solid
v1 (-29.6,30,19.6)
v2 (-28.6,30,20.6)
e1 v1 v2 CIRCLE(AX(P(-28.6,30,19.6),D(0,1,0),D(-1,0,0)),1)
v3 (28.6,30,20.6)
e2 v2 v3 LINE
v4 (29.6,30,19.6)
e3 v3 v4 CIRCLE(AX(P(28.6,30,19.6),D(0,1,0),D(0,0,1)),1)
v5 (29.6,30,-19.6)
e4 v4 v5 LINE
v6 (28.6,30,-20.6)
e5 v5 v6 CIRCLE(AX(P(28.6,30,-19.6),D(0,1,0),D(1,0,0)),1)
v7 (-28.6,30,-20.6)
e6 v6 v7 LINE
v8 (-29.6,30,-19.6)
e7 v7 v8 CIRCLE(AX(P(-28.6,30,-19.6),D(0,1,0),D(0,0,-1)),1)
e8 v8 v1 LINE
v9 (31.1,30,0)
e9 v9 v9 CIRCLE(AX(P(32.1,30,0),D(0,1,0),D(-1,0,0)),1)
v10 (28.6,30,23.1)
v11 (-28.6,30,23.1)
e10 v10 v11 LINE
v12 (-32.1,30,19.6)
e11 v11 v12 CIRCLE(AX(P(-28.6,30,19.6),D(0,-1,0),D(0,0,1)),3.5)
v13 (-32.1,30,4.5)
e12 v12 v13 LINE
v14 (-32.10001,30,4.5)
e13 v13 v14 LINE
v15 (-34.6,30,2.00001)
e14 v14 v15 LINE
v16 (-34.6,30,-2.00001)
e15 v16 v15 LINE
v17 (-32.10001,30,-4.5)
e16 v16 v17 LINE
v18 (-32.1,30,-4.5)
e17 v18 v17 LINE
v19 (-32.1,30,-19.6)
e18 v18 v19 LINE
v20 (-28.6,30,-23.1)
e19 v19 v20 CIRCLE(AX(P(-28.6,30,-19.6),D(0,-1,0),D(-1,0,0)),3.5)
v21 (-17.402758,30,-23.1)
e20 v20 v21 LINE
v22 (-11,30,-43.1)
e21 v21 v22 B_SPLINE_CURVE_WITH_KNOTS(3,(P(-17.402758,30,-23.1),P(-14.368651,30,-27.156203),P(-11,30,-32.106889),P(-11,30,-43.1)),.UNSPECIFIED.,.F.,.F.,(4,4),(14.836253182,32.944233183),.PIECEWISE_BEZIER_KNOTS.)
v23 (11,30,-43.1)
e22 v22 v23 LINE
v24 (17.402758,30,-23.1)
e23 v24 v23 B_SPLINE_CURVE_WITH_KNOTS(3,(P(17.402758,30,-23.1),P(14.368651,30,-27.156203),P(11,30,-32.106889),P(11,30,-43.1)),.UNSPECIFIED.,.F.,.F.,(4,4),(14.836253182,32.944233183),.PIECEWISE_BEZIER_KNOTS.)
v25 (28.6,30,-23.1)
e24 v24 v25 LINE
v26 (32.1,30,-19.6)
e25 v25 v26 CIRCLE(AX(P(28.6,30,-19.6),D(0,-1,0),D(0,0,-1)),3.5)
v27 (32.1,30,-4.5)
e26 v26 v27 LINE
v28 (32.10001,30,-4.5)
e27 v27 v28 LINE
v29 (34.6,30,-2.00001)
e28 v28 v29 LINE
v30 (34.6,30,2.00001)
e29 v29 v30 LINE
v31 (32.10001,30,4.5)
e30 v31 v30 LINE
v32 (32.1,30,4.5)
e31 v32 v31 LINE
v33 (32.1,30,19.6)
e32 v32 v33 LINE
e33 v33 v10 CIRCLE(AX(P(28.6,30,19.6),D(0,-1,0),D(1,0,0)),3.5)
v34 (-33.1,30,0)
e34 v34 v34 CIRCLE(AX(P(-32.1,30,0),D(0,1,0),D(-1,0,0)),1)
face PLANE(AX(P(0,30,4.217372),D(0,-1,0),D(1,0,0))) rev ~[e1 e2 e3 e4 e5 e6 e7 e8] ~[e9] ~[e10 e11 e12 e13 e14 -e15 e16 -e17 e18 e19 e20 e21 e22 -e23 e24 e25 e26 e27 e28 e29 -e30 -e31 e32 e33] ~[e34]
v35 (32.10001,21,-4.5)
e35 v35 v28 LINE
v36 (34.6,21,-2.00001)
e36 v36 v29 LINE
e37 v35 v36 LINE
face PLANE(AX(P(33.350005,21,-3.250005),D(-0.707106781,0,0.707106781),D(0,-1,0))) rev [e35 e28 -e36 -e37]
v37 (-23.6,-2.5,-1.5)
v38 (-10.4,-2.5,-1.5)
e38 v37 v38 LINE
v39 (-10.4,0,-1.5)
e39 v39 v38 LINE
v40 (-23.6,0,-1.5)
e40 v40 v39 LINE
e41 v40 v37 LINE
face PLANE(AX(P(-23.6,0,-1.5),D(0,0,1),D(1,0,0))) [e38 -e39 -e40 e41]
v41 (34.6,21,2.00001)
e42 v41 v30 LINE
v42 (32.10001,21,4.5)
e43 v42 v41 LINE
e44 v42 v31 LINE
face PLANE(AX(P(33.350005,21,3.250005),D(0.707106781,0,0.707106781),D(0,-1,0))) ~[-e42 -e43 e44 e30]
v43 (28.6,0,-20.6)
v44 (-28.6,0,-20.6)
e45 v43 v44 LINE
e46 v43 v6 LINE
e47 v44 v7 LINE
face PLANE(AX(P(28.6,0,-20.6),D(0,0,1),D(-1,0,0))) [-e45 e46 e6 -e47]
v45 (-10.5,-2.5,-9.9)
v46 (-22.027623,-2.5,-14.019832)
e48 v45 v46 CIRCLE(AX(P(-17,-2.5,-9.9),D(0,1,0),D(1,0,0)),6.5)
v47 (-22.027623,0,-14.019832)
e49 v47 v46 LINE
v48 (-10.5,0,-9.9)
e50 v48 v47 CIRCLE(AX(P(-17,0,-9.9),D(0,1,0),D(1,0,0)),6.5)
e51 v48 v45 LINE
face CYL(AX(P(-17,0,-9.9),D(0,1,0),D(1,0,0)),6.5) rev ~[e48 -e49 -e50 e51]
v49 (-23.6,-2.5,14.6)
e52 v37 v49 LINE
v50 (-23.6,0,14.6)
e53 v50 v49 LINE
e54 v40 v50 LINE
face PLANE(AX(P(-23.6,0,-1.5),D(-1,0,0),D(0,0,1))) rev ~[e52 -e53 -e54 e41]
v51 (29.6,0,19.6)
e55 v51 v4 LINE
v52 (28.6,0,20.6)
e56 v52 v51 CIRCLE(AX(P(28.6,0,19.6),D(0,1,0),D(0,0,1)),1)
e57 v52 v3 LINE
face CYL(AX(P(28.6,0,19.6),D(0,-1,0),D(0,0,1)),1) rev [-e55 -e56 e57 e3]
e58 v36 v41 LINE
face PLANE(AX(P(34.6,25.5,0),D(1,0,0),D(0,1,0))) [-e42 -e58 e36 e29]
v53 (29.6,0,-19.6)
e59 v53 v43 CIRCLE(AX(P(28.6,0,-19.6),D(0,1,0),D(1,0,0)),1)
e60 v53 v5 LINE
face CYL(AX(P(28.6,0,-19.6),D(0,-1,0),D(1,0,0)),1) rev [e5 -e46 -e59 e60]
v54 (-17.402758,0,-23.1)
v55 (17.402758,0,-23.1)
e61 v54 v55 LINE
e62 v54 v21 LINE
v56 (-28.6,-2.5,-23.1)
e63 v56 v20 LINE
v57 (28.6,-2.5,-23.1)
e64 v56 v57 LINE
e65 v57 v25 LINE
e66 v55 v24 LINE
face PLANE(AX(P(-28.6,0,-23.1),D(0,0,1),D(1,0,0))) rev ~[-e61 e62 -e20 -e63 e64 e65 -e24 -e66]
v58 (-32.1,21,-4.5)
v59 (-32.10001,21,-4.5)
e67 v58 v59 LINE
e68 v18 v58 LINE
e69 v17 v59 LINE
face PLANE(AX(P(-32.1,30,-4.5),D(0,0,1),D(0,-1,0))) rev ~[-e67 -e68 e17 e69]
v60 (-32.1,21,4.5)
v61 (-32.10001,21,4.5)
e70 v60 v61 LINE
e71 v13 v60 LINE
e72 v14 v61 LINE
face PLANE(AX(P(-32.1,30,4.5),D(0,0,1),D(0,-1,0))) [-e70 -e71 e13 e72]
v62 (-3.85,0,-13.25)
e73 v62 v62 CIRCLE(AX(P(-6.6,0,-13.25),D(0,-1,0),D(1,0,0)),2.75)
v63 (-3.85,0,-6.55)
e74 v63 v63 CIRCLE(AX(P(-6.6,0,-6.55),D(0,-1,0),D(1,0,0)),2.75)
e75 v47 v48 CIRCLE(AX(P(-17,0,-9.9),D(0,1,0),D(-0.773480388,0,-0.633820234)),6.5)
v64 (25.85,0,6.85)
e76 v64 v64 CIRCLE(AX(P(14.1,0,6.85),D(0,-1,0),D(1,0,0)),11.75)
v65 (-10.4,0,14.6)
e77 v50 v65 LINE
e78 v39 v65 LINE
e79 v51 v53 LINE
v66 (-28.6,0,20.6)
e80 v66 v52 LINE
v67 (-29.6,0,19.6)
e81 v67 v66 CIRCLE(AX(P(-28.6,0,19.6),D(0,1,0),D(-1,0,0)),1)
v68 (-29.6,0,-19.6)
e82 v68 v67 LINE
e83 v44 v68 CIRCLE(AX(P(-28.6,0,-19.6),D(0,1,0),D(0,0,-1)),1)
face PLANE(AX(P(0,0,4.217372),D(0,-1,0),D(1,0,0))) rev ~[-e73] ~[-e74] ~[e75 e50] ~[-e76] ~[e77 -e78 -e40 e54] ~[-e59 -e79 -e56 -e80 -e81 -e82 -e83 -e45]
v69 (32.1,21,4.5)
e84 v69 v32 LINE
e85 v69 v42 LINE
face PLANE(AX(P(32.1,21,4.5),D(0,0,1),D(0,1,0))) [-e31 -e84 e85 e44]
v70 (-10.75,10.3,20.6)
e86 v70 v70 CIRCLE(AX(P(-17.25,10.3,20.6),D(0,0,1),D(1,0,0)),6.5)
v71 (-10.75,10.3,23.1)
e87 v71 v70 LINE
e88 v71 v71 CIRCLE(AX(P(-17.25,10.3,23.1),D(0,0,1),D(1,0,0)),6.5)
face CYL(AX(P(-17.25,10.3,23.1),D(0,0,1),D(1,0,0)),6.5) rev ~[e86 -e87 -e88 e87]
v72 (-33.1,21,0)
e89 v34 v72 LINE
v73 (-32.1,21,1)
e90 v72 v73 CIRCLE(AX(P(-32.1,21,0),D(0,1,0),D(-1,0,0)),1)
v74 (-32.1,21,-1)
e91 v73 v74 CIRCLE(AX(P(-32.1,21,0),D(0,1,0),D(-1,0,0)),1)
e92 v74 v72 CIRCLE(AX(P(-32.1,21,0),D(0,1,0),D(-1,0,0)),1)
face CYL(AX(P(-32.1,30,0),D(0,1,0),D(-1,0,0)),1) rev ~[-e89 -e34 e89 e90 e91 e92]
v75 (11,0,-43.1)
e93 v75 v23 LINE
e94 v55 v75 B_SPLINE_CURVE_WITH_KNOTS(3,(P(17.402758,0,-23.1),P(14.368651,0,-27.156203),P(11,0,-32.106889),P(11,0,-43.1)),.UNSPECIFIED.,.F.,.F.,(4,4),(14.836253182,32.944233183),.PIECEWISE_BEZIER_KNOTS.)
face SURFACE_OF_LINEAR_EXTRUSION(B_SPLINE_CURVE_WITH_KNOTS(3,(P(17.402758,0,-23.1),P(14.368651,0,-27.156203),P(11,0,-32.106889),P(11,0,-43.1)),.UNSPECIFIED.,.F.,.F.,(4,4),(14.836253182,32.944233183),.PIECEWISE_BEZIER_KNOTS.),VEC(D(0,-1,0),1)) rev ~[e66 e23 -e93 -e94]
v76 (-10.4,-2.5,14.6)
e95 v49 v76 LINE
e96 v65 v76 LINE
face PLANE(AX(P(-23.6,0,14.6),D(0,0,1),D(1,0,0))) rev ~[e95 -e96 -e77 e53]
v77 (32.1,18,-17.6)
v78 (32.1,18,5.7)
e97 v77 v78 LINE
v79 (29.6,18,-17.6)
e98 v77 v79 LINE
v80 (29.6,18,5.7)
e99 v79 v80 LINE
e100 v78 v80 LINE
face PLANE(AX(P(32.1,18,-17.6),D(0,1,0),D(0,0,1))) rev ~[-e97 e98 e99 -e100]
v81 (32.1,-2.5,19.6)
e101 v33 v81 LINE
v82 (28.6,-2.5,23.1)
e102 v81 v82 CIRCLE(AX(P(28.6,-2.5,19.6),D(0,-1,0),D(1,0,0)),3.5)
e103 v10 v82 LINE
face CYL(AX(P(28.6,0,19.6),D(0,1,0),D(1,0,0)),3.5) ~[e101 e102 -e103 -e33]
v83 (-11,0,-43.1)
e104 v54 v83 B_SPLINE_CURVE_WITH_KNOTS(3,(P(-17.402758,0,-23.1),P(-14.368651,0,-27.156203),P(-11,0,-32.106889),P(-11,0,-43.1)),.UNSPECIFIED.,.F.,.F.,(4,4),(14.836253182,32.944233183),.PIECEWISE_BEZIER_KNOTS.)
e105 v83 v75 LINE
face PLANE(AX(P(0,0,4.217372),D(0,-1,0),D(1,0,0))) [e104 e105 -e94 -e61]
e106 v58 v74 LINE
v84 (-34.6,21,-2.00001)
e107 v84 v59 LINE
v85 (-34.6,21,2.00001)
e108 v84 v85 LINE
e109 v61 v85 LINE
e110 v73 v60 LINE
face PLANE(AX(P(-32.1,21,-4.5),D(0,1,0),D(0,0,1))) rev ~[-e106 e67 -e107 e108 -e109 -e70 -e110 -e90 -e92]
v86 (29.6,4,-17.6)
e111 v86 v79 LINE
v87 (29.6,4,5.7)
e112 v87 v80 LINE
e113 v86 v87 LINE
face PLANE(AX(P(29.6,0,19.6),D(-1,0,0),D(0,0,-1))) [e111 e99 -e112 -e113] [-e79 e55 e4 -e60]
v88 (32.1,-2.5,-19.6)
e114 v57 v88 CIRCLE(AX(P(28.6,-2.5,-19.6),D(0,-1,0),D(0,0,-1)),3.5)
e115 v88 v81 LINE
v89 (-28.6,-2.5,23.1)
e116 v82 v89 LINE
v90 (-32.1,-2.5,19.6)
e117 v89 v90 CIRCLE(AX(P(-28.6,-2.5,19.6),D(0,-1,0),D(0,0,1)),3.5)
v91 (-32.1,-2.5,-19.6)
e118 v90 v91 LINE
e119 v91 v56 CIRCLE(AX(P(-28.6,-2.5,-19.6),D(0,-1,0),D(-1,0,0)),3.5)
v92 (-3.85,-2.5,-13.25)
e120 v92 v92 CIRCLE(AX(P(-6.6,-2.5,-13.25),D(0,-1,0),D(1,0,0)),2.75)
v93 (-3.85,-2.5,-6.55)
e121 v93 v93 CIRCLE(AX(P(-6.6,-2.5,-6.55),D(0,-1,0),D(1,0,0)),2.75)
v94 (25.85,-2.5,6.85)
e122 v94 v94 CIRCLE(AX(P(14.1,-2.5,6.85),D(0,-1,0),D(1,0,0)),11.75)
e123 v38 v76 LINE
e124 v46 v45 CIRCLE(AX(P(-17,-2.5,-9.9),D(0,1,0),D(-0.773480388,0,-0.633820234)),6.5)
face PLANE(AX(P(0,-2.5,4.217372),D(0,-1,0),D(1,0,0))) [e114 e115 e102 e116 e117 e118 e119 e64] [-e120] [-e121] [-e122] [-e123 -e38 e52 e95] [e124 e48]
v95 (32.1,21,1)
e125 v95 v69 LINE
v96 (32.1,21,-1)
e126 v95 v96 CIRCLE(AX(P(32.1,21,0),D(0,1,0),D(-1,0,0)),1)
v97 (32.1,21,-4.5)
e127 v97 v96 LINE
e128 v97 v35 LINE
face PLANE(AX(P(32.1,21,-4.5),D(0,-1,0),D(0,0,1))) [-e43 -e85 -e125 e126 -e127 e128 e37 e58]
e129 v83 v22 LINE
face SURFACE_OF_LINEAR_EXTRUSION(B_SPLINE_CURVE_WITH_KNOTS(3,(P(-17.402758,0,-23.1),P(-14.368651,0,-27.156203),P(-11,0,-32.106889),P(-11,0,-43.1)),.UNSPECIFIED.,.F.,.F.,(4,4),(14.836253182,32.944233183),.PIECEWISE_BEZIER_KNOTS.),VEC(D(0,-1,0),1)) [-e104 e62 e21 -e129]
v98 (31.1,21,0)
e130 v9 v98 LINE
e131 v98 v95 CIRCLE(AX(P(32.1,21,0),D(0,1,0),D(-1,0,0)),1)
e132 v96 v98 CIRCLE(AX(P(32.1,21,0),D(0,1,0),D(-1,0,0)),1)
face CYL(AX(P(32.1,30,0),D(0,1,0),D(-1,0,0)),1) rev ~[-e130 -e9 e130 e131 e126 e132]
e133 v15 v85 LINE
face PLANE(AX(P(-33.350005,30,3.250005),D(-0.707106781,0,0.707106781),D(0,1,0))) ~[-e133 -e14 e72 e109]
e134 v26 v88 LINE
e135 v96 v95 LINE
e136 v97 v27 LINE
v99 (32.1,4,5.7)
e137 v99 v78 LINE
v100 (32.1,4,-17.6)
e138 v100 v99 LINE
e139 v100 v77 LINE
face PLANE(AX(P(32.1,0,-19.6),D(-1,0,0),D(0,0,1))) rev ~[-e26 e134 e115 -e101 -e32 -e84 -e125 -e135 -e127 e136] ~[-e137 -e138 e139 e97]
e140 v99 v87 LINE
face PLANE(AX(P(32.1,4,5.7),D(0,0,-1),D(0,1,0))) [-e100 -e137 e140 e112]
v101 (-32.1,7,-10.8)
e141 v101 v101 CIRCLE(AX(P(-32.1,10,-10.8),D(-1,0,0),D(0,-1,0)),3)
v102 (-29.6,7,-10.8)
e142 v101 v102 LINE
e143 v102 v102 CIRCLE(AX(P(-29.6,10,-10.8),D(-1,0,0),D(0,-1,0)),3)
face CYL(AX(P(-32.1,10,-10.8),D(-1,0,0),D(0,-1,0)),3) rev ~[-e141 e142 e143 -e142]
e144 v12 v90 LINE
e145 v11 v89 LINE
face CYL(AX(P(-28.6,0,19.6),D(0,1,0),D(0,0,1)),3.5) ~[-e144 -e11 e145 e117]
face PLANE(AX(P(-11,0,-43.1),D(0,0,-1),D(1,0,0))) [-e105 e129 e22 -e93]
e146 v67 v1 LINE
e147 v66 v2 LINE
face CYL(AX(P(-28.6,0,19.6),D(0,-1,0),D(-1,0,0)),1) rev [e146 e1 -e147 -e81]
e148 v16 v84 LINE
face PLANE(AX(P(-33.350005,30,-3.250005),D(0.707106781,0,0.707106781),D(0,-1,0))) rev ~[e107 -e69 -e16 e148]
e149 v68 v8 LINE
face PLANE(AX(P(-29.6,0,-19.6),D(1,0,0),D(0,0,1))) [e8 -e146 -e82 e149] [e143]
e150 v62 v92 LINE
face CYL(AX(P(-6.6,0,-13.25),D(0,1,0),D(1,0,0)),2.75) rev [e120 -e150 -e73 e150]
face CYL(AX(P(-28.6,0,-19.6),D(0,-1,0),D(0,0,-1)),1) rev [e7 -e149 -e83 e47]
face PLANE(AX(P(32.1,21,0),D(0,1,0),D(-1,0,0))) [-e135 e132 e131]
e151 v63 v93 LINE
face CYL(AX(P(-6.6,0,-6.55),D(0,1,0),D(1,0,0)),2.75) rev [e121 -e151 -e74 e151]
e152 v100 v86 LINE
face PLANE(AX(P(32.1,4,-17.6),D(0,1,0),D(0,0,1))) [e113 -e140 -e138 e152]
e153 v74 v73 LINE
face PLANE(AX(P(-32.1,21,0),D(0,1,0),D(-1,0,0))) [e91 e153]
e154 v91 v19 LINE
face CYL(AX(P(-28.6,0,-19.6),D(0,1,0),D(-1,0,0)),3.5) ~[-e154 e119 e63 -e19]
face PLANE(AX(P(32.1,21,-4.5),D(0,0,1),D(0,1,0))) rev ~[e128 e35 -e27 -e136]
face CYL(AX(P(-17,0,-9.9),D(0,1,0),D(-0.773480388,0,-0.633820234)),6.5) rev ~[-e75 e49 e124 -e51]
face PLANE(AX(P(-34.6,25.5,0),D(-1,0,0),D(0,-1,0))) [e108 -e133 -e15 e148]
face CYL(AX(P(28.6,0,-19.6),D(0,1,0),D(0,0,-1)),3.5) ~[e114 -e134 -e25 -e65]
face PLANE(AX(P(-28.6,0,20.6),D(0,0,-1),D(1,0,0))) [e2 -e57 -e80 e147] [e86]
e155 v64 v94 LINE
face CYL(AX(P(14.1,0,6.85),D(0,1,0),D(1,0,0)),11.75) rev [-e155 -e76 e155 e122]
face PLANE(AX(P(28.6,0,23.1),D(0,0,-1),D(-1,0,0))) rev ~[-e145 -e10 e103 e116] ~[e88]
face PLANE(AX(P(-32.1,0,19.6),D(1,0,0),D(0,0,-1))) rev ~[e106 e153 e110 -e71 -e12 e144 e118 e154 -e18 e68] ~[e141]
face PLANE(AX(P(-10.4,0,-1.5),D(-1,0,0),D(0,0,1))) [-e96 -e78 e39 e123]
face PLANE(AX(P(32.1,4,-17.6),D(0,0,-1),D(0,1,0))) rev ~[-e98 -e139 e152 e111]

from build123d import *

# Parameters (mm, degrees)
F1_DEPTH  = 30
F0_R      = 2.75
F0_W      = 13.2
F0_H      = 16.1
F0_R_2    = 11.75
F2_DEPTH  = 2.5
F3_R      = 6.5
F4_DEPTH  = 2.5
F5_R      = 3
F6_DEPTH  = 2.5
F7_W      = 14
F7_H      = 23.3
F8_DEPTH  = 2.5
F5_W      = 9
F5_H      = 9
F9_DEPTH  = 2.5
F7_W_2    = 9
F7_H_2    = 9
F10_DEPTH = 2.5
F11_SIZE  = 2.49999
F12_R     = 1
F13_DEPTH = 9


# Not quite as in the source:
# - a fillet or chamfer is up to 0.001 mm smaller than in the source, because OpenCascade refuses the exact size


with BuildPart() as f1:
    # F0 (on Front) → F1 (new body)
    with BuildSketch(Plane.XZ):
        with BuildLine():
            Line((-28.6, 20.6), (28.6, 20.6))
            ThreePointArc((28.6, 20.6), (29.3071067812, 20.3071067812), (29.6, 19.6))
            Line((29.6, 19.6), (29.6, -19.6))
            ThreePointArc((29.6, -19.6), (29.3071067812, -20.3071067812), (28.6, -20.6))
            Line((28.6, -20.6), (19.2463447419, -20.6))
            add(Edge.make_bspline(
                [(19.2463447419, -20.6), (18.6700440776, -21.4257741259), (18.043869698, -22.2429184725), (17.402758481, -23.1)],
                knots=[11.0100107819, 11.0100107819, 11.0100107819, 11.0100107819, 14.8362531821, 14.8362531821, 14.8362531821, 14.8362531821], degree=3))
            Line((17.402758481, -23.1), (28.6, -23.1))
            ThreePointArc((28.6, -23.1), (31.0748737342, -22.0748737342), (32.1, -19.6))
            Line((32.1, -19.6), (32.1, 19.6))
            ThreePointArc((32.1, 19.6), (31.0748737342, 22.0748737342), (28.6, 23.1))
            Line((28.6, 23.1), (-28.6, 23.1))
            ThreePointArc((-28.6, 23.1), (-31.0748737342, 22.0748737342), (-32.1, 19.6))
            Line((-32.1, 19.6), (-32.1, -19.6))
            ThreePointArc((-32.1, -19.6), (-31.0748737342, -22.0748737342), (-28.6, -23.1))
            Line((-28.6, -23.1), (-17.402758481, -23.1))
            add(Edge.make_bspline(
                [(-19.2463447419, -20.6), (-18.6700440776, -21.4257741259), (-18.043869698, -22.2429184725), (-17.402758481, -23.1)],
                knots=[11.0100107819, 11.0100107819, 11.0100107819, 11.0100107819, 14.8362531821, 14.8362531821, 14.8362531821, 14.8362531821], degree=3))
            Line((-19.2463447419, -20.6), (-28.6, -20.6))
            ThreePointArc((-28.6, -20.6), (-29.3071067812, -20.3071067812), (-29.6, -19.6))
            Line((-29.6, -19.6), (-29.6, 19.6))
            ThreePointArc((-29.6, 19.6), (-29.3071067812, 20.3071067812), (-28.6, 20.6))
        make_face()
        with BuildLine():
            add(Edge.make_bspline(
                [(19.2463447419, -20.6), (18.6700440776, -21.4257741259), (18.043869698, -22.2429184725), (17.402758481, -23.1)],
                knots=[11.0100107819, 11.0100107819, 11.0100107819, 11.0100107819, 14.8362531821, 14.8362531821, 14.8362531821, 14.8362531821], degree=3))
            Line((19.2463447419, -20.6), (-19.2463447419, -20.6))
            add(Edge.make_bspline(
                [(-19.2463447419, -20.6), (-18.6700440776, -21.4257741259), (-18.043869698, -22.2429184725), (-17.402758481, -23.1)],
                knots=[11.0100107819, 11.0100107819, 11.0100107819, 11.0100107819, 14.8362531821, 14.8362531821, 14.8362531821, 14.8362531821], degree=3))
            Line((-17.402758481, -23.1), (17.402758481, -23.1))
        make_face()
        with BuildLine():
            add(Edge.make_bspline(
                [(17.402758481, -23.1), (14.3686514172, -27.1562028058), (11, -32.1068893696), (11, -43.1)],
                knots=[14.8362531821, 14.8362531821, 14.8362531821, 14.8362531821, 32.9442331828, 32.9442331828, 32.9442331828, 32.9442331828], degree=3))
            Line((17.402758481, -23.1), (-17.402758481, -23.1))
            add(Edge.make_bspline(
                [(-17.402758481, -23.1), (-14.3686514172, -27.1562028058), (-11, -32.1068893696), (-11, -43.1)],
                knots=[14.8362531821, 14.8362531821, 14.8362531821, 14.8362531821, 32.9442331828, 32.9442331828, 32.9442331828, 32.9442331828], degree=3))
            Line((-11, -43.1), (11, -43.1))
        make_face()
    extrude(amount=-F1_DEPTH)

    # F0 (on Front) → F2 (join)
    with BuildSketch(Plane.XZ):
        with BuildLine():
            Line((-28.6, 20.6), (28.6, 20.6))
            ThreePointArc((28.6, 20.6), (29.3071067812, 20.3071067812), (29.6, 19.6))
            Line((29.6, 19.6), (29.6, -19.6))
            ThreePointArc((29.6, -19.6), (29.3071067812, -20.3071067812), (28.6, -20.6))
            Line((28.6, -20.6), (19.2463447419, -20.6))
            add(Edge.make_bspline(
                [(19.2463447419, -20.6), (18.6700440776, -21.4257741259), (18.043869698, -22.2429184725), (17.402758481, -23.1)],
                knots=[11.0100107819, 11.0100107819, 11.0100107819, 11.0100107819, 14.8362531821, 14.8362531821, 14.8362531821, 14.8362531821], degree=3))
            Line((17.402758481, -23.1), (28.6, -23.1))
            ThreePointArc((28.6, -23.1), (31.0748737342, -22.0748737342), (32.1, -19.6))
            Line((32.1, -19.6), (32.1, 19.6))
            ThreePointArc((32.1, 19.6), (31.0748737342, 22.0748737342), (28.6, 23.1))
            Line((28.6, 23.1), (-28.6, 23.1))
            ThreePointArc((-28.6, 23.1), (-31.0748737342, 22.0748737342), (-32.1, 19.6))
            Line((-32.1, 19.6), (-32.1, -19.6))
            ThreePointArc((-32.1, -19.6), (-31.0748737342, -22.0748737342), (-28.6, -23.1))
            Line((-28.6, -23.1), (-17.402758481, -23.1))
            add(Edge.make_bspline(
                [(-19.2463447419, -20.6), (-18.6700440776, -21.4257741259), (-18.043869698, -22.2429184725), (-17.402758481, -23.1)],
                knots=[11.0100107819, 11.0100107819, 11.0100107819, 11.0100107819, 14.8362531821, 14.8362531821, 14.8362531821, 14.8362531821], degree=3))
            Line((-19.2463447419, -20.6), (-28.6, -20.6))
            ThreePointArc((-28.6, -20.6), (-29.3071067812, -20.3071067812), (-29.6, -19.6))
            Line((-29.6, -19.6), (-29.6, 19.6))
            ThreePointArc((-29.6, 19.6), (-29.3071067812, 20.3071067812), (-28.6, 20.6))
        make_face()
        with BuildLine():
            ThreePointArc((29.6, 19.6), (29.3071067812, 20.3071067812), (28.6, 20.6))
            Line((28.6, 20.6), (-28.6, 20.6))
            ThreePointArc((-28.6, 20.6), (-29.3071067812, 20.3071067812), (-29.6, 19.6))
            Line((-29.6, 19.6), (-29.6, -19.6))
            ThreePointArc((-29.6, -19.6), (-29.3071067812, -20.3071067812), (-28.6, -20.6))
            Line((-28.6, -20.6), (-19.2463447419, -20.6))
            Line((-19.2463447419, -20.6), (19.2463447419, -20.6))
            Line((19.2463447419, -20.6), (28.6, -20.6))
            ThreePointArc((28.6, -20.6), (29.3071067812, -20.3071067812), (29.6, -19.6))
            Line((29.6, -19.6), (29.6, 19.6))
        make_face()
        with Locations((-6.6, -13.25)):
            Circle(F0_R, mode=Mode.SUBTRACT)
        with BuildLine():
            ThreePointArc((-10.5, -9.9), (-14.8124838728, -16.0208474244), (-22.027622521, -14.019831524))
            ThreePointArc((-22.027622521, -14.019831524), (-19.1875161272, -3.7791525756), (-10.5, -9.9))
        make_face(mode=Mode.SUBTRACT)
        with Locations((-17, 6.55)):
            Rectangle(F0_W, F0_H, mode=Mode.SUBTRACT)
        with Locations((-6.6, -6.55)):
            Circle(F0_R, mode=Mode.SUBTRACT)
        with Locations((14.1, 6.85)):
            Circle(F0_R_2, mode=Mode.SUBTRACT)
        with BuildLine():
            add(Edge.make_bspline(
                [(19.2463447419, -20.6), (18.6700440776, -21.4257741259), (18.043869698, -22.2429184725), (17.402758481, -23.1)],
                knots=[11.0100107819, 11.0100107819, 11.0100107819, 11.0100107819, 14.8362531821, 14.8362531821, 14.8362531821, 14.8362531821], degree=3))
            Line((19.2463447419, -20.6), (-19.2463447419, -20.6))
            add(Edge.make_bspline(
                [(-19.2463447419, -20.6), (-18.6700440776, -21.4257741259), (-18.043869698, -22.2429184725), (-17.402758481, -23.1)],
                knots=[11.0100107819, 11.0100107819, 11.0100107819, 11.0100107819, 14.8362531821, 14.8362531821, 14.8362531821, 14.8362531821], degree=3))
            Line((-17.402758481, -23.1), (17.402758481, -23.1))
        make_face()
    extrude(amount=F2_DEPTH)

    # F3 (on face) → F4 (cut, through all)
    with BuildSketch(Plane.XY.offset(23.1)):
        with Locations((-17.25, 10.3)):
            Circle(F3_R)
    extrude(amount=-F4_DEPTH, mode=Mode.SUBTRACT)

    # F5 (on face) → F6 (cut, through all)
    with BuildSketch(Plane(origin=(-32.1, 0, 0), x_dir=(0, -1, 0), z_dir=(-1, 0, 0))):
        with Locations((-10, -10.8)):
            Circle(F5_R)
    extrude(amount=-F6_DEPTH, mode=Mode.SUBTRACT)

    # F7 (on face) → F8 (cut, through all)
    with BuildSketch(Plane.YZ.offset(32.1)):
        with Locations((11, -5.95)):
            Rectangle(F7_W, F7_H)
    extrude(amount=-F8_DEPTH, mode=Mode.SUBTRACT)

    # F5 (on face) → F9 (join)
    with BuildSketch(Plane(origin=(-32.1, 0, 0), x_dir=(0, -1, 0), z_dir=(-1, 0, 0))):
        with Locations((-25.5, 0)):
            Rectangle(F5_W, F5_H)
    extrude(amount=F9_DEPTH)

    # F7 (on face) → F10 (join)
    with BuildSketch(Plane.YZ.offset(32.1)):
        with Locations((25.5, 0)):
            Rectangle(F7_W_2, F7_H_2)
    extrude(amount=F10_DEPTH)

    # F11 (size 2.5 in the source; OpenCascade refuses exactly that, so slightly less here)
    f11_edges = [f1.edges().sort_by_distance(p)[0] for p in [
        (-34.6, 25.5, -4.5),
        (-34.6, 25.5, 4.5),
        (34.6, 25.5, 4.5),
        (34.6, 25.5, -4.5),
    ]]
    chamfer(f11_edges, length=F11_SIZE)

    # F12 (on face) → F13 (cut)
    with BuildSketch(Plane(origin=(0, 30, 0), x_dir=(-1, 0, 0), z_dir=(0, 1, 0))):
        with Locations((-32.1, 0)):
            Circle(F12_R)
        with Locations((32.1, 0)):
            Circle(F12_R)
    extrude(amount=-F13_DEPTH, mode=Mode.SUBTRACT)


solid = f1.part
